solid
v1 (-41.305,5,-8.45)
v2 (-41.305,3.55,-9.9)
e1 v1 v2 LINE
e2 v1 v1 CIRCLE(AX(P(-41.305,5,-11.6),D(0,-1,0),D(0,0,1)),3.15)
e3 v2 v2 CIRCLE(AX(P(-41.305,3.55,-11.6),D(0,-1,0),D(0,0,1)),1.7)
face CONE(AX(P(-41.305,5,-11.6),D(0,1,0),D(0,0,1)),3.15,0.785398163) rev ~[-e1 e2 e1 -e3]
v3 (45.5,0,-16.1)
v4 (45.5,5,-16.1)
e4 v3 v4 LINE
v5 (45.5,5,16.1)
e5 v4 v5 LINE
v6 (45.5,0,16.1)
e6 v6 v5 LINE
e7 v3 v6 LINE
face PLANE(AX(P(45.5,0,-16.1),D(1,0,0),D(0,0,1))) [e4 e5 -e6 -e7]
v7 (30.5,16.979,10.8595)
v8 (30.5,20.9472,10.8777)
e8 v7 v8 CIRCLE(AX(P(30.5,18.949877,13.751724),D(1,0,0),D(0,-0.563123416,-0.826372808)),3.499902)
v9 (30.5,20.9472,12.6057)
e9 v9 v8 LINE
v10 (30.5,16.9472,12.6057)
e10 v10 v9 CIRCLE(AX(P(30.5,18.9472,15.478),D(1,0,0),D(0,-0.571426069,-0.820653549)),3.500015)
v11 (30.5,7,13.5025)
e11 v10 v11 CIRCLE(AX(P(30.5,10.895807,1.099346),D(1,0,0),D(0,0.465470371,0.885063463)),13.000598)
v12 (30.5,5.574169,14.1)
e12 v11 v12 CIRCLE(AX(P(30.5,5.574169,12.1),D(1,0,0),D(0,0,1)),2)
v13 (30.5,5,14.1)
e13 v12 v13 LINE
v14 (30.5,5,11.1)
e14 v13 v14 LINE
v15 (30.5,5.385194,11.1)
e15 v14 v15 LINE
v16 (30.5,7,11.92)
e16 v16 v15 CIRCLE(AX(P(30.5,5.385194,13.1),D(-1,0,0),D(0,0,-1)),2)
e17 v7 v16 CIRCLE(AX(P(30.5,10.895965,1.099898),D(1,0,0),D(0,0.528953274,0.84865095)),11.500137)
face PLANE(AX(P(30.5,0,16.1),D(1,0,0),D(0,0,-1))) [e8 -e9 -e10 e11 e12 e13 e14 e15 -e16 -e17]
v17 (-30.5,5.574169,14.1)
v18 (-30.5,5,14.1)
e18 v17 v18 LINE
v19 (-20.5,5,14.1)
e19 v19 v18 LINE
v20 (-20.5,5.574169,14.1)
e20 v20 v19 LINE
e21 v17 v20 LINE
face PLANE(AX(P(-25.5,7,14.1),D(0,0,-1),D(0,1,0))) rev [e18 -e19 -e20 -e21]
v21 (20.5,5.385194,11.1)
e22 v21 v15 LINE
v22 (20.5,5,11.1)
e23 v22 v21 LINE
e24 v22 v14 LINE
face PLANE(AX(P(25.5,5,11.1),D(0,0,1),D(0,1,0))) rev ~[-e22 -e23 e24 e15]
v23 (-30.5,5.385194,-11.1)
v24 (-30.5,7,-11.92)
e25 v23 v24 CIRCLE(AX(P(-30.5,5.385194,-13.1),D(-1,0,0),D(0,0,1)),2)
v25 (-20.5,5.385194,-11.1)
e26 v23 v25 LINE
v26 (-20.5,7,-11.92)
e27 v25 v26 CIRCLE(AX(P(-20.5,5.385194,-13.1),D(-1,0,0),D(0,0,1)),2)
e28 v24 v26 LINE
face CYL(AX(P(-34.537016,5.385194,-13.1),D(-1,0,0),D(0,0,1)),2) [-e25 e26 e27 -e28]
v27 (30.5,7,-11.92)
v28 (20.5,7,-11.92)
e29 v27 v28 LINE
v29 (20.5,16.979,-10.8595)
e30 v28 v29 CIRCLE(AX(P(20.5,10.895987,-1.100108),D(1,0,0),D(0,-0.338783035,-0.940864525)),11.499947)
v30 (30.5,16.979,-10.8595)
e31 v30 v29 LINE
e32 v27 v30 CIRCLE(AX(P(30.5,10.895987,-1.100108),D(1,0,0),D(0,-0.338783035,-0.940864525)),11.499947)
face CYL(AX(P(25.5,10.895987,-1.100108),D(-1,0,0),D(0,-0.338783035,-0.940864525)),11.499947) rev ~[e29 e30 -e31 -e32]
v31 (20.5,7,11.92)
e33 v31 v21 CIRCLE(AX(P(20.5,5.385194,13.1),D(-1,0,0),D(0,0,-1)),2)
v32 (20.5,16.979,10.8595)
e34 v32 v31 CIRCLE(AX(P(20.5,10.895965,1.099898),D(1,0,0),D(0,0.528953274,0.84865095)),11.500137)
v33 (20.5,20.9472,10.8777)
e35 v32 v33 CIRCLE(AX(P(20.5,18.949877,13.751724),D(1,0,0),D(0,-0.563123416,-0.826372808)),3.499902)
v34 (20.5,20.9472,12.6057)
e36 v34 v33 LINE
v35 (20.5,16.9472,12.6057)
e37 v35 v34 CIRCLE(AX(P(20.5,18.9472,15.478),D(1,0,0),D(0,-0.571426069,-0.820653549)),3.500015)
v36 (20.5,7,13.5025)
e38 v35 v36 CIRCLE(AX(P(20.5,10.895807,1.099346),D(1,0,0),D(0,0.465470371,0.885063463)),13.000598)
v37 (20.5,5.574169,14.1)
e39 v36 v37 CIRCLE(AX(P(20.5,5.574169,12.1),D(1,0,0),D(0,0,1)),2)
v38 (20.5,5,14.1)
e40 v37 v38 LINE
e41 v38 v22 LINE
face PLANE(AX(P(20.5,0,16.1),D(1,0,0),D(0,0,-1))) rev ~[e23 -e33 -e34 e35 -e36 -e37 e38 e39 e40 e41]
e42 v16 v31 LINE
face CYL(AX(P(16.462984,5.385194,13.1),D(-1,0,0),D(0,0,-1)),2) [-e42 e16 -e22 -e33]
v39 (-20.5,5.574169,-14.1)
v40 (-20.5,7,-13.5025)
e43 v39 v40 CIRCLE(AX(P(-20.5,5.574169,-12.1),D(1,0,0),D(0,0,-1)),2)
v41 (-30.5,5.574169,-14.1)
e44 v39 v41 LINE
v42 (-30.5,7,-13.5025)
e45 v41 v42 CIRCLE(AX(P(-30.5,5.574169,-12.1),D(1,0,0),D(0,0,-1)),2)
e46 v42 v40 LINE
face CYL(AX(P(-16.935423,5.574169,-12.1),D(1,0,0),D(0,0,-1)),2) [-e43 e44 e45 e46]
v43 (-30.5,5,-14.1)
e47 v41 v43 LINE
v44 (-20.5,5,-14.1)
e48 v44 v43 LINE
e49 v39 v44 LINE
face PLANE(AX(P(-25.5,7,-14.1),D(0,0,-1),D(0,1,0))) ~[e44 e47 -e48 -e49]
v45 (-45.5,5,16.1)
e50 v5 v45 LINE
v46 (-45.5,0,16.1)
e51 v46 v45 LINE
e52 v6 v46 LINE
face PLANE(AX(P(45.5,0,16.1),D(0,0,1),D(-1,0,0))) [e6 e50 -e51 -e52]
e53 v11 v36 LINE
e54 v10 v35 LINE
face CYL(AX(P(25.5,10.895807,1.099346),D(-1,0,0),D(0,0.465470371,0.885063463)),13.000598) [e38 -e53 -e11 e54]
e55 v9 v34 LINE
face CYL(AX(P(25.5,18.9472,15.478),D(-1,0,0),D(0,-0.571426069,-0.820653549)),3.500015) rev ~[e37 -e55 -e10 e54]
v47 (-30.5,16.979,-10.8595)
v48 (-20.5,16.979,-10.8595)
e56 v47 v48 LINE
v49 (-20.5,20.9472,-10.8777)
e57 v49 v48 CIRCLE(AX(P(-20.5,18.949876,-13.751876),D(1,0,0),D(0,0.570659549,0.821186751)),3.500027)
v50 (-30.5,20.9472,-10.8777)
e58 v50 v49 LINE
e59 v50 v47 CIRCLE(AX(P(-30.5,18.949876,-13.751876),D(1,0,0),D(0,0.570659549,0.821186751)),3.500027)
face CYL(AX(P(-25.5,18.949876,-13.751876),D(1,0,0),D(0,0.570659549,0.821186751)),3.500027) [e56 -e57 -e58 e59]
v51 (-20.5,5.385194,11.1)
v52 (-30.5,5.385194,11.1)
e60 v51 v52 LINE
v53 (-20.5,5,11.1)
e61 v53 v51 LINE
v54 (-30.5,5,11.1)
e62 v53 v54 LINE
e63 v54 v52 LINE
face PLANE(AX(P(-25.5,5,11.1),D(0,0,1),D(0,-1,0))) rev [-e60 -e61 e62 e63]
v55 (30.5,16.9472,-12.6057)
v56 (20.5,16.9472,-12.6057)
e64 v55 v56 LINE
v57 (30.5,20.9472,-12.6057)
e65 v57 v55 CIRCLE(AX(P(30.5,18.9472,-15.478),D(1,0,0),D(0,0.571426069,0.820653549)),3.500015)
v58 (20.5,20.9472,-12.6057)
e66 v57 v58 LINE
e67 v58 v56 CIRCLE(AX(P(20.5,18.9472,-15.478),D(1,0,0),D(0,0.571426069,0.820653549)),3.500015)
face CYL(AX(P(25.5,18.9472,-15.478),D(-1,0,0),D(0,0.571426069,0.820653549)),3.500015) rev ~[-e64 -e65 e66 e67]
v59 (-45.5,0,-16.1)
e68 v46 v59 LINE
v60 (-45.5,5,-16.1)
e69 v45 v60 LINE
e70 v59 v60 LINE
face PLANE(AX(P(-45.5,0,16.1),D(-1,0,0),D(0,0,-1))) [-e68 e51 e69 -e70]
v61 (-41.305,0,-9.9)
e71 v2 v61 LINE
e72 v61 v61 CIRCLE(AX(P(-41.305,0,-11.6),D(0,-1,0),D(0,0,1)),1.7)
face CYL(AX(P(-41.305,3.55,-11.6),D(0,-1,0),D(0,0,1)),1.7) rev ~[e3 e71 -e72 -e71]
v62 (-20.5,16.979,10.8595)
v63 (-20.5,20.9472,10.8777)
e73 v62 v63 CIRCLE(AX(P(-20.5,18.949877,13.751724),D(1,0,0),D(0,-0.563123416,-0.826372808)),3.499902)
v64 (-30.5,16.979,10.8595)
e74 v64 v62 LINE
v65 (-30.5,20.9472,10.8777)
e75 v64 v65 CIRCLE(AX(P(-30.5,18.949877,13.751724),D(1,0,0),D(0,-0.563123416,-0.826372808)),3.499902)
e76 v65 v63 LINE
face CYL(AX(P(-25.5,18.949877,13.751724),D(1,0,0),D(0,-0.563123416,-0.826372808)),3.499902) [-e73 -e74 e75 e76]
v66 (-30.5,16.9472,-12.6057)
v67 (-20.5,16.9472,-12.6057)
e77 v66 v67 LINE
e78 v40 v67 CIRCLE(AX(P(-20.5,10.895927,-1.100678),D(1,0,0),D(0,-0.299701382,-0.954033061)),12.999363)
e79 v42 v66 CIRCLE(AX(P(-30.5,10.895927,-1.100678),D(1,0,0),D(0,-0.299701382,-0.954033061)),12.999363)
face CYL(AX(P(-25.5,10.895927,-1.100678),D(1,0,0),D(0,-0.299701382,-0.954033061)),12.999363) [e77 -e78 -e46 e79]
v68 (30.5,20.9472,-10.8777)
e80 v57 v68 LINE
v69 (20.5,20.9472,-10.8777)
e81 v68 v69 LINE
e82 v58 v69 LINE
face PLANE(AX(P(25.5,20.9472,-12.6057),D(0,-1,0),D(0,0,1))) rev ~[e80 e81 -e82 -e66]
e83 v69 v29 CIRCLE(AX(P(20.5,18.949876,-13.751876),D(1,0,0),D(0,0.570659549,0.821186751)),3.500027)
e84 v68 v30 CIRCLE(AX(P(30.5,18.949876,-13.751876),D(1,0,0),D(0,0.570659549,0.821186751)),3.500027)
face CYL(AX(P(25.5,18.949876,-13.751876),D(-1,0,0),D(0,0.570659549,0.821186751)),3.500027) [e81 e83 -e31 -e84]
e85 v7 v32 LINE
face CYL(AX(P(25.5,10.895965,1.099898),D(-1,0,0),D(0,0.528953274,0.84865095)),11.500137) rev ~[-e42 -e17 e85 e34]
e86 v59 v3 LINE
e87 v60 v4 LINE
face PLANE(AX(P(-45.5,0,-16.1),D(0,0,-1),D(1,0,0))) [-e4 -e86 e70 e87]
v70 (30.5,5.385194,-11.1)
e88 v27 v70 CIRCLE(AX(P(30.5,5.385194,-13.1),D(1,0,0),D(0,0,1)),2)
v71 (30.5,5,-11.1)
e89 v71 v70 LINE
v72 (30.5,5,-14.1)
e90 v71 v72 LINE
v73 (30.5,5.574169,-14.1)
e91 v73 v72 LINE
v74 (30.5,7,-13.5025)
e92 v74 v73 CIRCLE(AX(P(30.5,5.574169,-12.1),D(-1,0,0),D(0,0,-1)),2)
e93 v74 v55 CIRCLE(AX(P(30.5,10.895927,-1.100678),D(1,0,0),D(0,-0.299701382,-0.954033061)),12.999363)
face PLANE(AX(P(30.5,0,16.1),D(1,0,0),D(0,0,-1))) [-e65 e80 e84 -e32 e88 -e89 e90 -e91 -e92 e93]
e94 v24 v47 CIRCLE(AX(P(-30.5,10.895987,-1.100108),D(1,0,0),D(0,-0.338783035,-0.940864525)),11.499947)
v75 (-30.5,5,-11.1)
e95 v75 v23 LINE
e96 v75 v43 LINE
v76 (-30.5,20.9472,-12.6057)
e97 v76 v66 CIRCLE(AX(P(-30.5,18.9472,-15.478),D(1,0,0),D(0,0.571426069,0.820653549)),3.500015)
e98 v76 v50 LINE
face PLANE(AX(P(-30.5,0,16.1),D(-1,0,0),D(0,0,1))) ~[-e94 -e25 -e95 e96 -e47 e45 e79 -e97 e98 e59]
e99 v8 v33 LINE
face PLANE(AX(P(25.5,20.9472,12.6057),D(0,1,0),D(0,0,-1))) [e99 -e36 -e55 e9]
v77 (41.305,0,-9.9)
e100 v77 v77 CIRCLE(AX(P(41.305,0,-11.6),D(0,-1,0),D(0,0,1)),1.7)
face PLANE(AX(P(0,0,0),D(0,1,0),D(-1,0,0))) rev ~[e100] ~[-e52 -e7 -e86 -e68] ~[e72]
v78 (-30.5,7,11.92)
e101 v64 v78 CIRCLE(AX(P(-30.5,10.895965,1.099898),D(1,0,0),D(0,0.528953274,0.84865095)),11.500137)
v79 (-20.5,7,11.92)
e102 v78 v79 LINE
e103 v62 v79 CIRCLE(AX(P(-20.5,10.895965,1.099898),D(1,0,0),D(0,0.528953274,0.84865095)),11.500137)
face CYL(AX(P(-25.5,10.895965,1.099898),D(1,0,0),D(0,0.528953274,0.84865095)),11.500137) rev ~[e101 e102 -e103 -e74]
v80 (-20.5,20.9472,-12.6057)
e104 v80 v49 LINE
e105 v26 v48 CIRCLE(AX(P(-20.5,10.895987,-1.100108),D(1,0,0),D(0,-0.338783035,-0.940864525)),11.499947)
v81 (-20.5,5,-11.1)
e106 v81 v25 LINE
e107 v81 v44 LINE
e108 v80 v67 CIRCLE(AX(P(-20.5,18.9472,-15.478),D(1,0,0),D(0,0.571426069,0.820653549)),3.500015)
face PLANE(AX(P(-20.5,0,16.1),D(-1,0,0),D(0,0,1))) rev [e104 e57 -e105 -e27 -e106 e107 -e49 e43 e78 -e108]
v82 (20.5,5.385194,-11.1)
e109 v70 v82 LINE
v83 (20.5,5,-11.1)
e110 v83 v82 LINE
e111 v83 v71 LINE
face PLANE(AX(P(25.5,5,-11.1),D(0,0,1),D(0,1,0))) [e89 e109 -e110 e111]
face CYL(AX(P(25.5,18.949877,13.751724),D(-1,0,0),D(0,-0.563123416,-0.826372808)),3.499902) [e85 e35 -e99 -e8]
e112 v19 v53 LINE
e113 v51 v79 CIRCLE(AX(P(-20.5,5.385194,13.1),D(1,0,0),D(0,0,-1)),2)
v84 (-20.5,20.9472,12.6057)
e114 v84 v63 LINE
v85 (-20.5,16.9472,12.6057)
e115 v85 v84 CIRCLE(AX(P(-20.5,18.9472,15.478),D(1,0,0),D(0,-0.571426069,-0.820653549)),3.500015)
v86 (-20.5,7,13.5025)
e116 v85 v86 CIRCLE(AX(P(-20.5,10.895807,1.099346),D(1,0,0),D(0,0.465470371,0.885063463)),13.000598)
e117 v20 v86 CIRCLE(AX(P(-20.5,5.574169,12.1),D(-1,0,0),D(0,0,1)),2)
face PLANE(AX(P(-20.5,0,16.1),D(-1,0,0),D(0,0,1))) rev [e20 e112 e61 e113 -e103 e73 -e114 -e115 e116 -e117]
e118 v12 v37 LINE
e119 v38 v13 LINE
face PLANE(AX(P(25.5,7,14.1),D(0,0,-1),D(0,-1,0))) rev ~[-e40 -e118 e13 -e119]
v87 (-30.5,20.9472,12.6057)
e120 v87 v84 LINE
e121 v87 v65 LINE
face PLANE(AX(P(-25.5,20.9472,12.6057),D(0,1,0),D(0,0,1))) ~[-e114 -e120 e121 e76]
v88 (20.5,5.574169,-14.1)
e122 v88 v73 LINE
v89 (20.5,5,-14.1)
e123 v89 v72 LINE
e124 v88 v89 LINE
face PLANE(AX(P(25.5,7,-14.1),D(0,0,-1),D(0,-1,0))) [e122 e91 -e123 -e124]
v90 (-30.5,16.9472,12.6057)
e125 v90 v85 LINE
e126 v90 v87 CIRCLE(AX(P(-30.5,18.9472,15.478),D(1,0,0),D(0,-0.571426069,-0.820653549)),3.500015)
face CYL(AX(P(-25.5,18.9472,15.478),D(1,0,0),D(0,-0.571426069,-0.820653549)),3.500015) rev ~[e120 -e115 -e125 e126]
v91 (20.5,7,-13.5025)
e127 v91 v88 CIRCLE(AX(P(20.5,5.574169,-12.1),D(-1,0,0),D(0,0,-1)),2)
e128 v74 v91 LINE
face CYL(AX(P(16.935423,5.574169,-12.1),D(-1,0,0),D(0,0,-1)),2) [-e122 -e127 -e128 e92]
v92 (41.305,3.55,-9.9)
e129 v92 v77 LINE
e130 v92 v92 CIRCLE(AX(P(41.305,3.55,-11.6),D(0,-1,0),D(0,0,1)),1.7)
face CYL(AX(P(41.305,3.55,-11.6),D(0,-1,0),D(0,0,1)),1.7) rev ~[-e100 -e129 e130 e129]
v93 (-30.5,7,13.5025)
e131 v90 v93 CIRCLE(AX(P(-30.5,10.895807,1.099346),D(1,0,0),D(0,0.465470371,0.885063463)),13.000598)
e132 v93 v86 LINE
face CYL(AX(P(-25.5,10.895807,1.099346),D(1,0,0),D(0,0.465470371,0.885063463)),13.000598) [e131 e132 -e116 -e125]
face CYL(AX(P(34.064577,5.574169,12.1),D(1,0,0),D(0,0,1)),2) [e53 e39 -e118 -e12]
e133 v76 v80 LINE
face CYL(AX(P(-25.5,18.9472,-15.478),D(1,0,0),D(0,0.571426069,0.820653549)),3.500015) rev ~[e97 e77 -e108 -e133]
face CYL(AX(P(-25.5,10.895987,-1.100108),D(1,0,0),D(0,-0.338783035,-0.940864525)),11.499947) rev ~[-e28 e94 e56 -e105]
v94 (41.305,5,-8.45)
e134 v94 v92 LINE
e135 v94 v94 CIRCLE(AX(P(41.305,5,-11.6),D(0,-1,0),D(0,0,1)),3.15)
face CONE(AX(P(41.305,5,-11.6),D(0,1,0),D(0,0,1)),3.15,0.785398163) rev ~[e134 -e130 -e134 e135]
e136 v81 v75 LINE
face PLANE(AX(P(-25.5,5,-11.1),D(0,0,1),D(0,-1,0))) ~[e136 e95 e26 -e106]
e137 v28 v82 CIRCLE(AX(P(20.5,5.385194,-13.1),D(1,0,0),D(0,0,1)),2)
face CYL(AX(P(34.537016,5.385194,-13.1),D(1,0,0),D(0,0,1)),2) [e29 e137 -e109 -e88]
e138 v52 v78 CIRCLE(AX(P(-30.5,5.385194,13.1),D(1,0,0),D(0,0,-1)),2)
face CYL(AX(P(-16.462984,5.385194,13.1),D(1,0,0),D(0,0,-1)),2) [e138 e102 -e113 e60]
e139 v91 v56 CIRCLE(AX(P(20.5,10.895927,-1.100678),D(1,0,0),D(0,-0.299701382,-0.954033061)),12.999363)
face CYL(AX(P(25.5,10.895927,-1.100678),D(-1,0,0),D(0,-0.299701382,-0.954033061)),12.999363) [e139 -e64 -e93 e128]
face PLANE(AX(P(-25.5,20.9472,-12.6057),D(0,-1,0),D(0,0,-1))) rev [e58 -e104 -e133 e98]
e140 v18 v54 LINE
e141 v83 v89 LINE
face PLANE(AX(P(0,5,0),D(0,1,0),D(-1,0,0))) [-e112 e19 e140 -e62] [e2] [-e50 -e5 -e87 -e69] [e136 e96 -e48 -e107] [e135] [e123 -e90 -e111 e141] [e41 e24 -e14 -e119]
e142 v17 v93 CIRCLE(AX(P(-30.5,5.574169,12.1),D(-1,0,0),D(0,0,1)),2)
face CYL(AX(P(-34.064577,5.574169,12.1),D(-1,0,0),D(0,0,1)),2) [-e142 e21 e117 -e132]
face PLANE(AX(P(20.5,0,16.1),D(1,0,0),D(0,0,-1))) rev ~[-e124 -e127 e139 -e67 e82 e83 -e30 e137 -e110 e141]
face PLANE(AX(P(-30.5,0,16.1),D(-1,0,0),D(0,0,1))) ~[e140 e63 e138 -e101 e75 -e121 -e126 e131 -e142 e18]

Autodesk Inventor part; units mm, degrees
ref_plane "YZ Plane" through (0, 0, 0) normal (1, 0, 0) x (0, 1, 0)
ref_plane "XZ Plane" through (0, 0, 0) normal (0, 1, 0) x (-1, 0, 0)
ref_plane "XY Plane" through (0, 0, 0) normal (0, 0, 1) x (1, 0, 0)
sketch "Sketch1" plane through (0, 0, 0) normal (0, 1, 0) x (-1, 0, 0)
  line L0 (41.305, -11.6) -> (-41.305, -11.6) construction
  line L1 (0, 107.889) -> (0, -128.889) construction
  line L2 (45.5, -16.1) -> (-45.5, -16.1)
  line L3 (-45.5, -16.1) -> (-45.5, 16.1)
  line L4 (-45.5, 16.1) -> (45.5, 16.1)
  line L5 (45.5, 16.1) -> (45.5, -16.1)
  line L6 (62.4324, 0) -> (-80.3334, 0) construction
  point P0 (0, 0)
  point P1 (45.5, 0)
  point P2 (0, 16.1)
  point P3 (0, -11.6)
  dimension "d1" = 82.61
  dimension "d2" = 91
  dimension "d3" = 32.2
  dimension "d4" = 4.5
extrude "Extrusion1" add sketch "Sketch1" along normal blind 5
sketch "Sketch2" plane through (0, 5, 0) normal (0, 1, 0) x (1, 0, 0)
  line L0 (-45.5, -16.1) -> (45.5, -16.1) projected
  line L1 (45.5, -16.1) -> (45.5, 16.1) projected
  line L2 (45.5, 16.1) -> (-45.5, 16.1) projected
  line L3 (-45.5, 16.1) -> (-45.5, -16.1) projected
  point P0 (0, 0)
  point P1 (41.305, 11.6)
  point P2 (-41.305, 11.6)
  point P3 (41.305, 11.6)
  point P4 (-41.305, 11.6)
hole "Hole1" at (41.305, 5, -11.6) at (-41.305, 5, -11.6) direction (0, -1, 0) diameter 3.4 depth 5 countersink diameter 6.3 countersink angle 90 clearance for "Countersunk Flat Head Screw ISO 2009/7046" size "M3" standard "ISO"
ref_plane "Work Plane1" through (25.5, 0, 16.1) normal (1, 0, 0) x (0, 0, -1)
ref_plane "Work Plane2" through (0, 0, 16.1) normal (1, 0, 0) x (0, 0, -1)
sketch "Sketch3" plane through (25.5, 0, 16.1) normal (1, 0, 0) x (0, 0, -1)
  line L0 (0, 5) -> (32.2, 5) projected
  line L1 (2, 5) -> (5, 5)
  line L2 (5, 5) -> (5, 7)
  line L3 (5, 7) -> (4.18, 7)
  line L4 (2, 7) -> (2, 5)
  line L5 (16.1, 17.288) -> (16.1, -5.2059) construction
  line L6 (0, 0) -> (0, 5) construction
  arc A0 (3.4943, 16.9472) -> (3.4943, 20.9472) centre (0.622, 18.9472) ccw
  arc A1 (5.2405, 16.979) -> (5.2223, 20.9472) centre (2.3482, 18.9499) ccw
  line L7 (3.4943, 20.9472) -> (5.2223, 20.9472)
  arc A2 (3.4943, 16.9472) -> (2.5975, 7) centre (15, 10.896) ccw
  arc A3 (5.2405, 16.979) -> (4.18, 7) centre (15, 10.896) ccw
  line L8 (2.5975, 7) -> (2, 7)
  line L9 (27.2, 5) -> (27.2, 7)
  line L10 (27.2, 7) -> (28.02, 7)
  line L11 (30.2, 7) -> (30.2, 5)
  line L12 (28.7057, 5) -> (28.7057, 18.917) construction
  arc A4 (28.7057, 20.9472) -> (28.7057, 16.9472) centre (31.578, 18.9472) ccw
  arc A5 (26.9777, 20.9472) -> (26.9595, 16.979) centre (29.8518, 18.9499) ccw
  line L13 (28.7057, 20.9472) -> (26.9777, 20.9472)
  arc A6 (29.6025, 7) -> (28.7057, 16.9472) centre (17.2, 10.896) ccw
  arc A7 (28.02, 7) -> (26.9595, 16.979) centre (17.2, 10.896) ccw
  line L14 (29.6025, 7) -> (30.2, 7)
  point P0 (16.1, 0)
  dimension "d20" = 3
  dimension "d21" = 2
  dimension "d23" = 2
  dimension "d25" = 4
  dimension "d26" = 3.5
  dimension "d27" = 3.5
  dimension "d31" = 16.1
  dimension "d32" = 1.5
  dimension "d33" = 0.5975
  dimension "d34" = 13
extrude "Extrusion2" add sketch "Sketch3" along normal mid plane 10
mirror "Mirror1" about plane through (0, 0, 16.1) normal (1, 0, 0) of "Extrusion2"
fillet "Fillet1" radius 2 8 edges at (25.5, 7, 14.1) (25.5, 7, 11.1) (-25.5, 7, 14.1) (-25.5, 7, 11.1) (25.5, 7, -11.1) (25.5, 7, -14.1) (-25.5, 7, -14.1) (-25.5, 7, -11.1)
properties part number "powerbank_mount_3DPrint"
